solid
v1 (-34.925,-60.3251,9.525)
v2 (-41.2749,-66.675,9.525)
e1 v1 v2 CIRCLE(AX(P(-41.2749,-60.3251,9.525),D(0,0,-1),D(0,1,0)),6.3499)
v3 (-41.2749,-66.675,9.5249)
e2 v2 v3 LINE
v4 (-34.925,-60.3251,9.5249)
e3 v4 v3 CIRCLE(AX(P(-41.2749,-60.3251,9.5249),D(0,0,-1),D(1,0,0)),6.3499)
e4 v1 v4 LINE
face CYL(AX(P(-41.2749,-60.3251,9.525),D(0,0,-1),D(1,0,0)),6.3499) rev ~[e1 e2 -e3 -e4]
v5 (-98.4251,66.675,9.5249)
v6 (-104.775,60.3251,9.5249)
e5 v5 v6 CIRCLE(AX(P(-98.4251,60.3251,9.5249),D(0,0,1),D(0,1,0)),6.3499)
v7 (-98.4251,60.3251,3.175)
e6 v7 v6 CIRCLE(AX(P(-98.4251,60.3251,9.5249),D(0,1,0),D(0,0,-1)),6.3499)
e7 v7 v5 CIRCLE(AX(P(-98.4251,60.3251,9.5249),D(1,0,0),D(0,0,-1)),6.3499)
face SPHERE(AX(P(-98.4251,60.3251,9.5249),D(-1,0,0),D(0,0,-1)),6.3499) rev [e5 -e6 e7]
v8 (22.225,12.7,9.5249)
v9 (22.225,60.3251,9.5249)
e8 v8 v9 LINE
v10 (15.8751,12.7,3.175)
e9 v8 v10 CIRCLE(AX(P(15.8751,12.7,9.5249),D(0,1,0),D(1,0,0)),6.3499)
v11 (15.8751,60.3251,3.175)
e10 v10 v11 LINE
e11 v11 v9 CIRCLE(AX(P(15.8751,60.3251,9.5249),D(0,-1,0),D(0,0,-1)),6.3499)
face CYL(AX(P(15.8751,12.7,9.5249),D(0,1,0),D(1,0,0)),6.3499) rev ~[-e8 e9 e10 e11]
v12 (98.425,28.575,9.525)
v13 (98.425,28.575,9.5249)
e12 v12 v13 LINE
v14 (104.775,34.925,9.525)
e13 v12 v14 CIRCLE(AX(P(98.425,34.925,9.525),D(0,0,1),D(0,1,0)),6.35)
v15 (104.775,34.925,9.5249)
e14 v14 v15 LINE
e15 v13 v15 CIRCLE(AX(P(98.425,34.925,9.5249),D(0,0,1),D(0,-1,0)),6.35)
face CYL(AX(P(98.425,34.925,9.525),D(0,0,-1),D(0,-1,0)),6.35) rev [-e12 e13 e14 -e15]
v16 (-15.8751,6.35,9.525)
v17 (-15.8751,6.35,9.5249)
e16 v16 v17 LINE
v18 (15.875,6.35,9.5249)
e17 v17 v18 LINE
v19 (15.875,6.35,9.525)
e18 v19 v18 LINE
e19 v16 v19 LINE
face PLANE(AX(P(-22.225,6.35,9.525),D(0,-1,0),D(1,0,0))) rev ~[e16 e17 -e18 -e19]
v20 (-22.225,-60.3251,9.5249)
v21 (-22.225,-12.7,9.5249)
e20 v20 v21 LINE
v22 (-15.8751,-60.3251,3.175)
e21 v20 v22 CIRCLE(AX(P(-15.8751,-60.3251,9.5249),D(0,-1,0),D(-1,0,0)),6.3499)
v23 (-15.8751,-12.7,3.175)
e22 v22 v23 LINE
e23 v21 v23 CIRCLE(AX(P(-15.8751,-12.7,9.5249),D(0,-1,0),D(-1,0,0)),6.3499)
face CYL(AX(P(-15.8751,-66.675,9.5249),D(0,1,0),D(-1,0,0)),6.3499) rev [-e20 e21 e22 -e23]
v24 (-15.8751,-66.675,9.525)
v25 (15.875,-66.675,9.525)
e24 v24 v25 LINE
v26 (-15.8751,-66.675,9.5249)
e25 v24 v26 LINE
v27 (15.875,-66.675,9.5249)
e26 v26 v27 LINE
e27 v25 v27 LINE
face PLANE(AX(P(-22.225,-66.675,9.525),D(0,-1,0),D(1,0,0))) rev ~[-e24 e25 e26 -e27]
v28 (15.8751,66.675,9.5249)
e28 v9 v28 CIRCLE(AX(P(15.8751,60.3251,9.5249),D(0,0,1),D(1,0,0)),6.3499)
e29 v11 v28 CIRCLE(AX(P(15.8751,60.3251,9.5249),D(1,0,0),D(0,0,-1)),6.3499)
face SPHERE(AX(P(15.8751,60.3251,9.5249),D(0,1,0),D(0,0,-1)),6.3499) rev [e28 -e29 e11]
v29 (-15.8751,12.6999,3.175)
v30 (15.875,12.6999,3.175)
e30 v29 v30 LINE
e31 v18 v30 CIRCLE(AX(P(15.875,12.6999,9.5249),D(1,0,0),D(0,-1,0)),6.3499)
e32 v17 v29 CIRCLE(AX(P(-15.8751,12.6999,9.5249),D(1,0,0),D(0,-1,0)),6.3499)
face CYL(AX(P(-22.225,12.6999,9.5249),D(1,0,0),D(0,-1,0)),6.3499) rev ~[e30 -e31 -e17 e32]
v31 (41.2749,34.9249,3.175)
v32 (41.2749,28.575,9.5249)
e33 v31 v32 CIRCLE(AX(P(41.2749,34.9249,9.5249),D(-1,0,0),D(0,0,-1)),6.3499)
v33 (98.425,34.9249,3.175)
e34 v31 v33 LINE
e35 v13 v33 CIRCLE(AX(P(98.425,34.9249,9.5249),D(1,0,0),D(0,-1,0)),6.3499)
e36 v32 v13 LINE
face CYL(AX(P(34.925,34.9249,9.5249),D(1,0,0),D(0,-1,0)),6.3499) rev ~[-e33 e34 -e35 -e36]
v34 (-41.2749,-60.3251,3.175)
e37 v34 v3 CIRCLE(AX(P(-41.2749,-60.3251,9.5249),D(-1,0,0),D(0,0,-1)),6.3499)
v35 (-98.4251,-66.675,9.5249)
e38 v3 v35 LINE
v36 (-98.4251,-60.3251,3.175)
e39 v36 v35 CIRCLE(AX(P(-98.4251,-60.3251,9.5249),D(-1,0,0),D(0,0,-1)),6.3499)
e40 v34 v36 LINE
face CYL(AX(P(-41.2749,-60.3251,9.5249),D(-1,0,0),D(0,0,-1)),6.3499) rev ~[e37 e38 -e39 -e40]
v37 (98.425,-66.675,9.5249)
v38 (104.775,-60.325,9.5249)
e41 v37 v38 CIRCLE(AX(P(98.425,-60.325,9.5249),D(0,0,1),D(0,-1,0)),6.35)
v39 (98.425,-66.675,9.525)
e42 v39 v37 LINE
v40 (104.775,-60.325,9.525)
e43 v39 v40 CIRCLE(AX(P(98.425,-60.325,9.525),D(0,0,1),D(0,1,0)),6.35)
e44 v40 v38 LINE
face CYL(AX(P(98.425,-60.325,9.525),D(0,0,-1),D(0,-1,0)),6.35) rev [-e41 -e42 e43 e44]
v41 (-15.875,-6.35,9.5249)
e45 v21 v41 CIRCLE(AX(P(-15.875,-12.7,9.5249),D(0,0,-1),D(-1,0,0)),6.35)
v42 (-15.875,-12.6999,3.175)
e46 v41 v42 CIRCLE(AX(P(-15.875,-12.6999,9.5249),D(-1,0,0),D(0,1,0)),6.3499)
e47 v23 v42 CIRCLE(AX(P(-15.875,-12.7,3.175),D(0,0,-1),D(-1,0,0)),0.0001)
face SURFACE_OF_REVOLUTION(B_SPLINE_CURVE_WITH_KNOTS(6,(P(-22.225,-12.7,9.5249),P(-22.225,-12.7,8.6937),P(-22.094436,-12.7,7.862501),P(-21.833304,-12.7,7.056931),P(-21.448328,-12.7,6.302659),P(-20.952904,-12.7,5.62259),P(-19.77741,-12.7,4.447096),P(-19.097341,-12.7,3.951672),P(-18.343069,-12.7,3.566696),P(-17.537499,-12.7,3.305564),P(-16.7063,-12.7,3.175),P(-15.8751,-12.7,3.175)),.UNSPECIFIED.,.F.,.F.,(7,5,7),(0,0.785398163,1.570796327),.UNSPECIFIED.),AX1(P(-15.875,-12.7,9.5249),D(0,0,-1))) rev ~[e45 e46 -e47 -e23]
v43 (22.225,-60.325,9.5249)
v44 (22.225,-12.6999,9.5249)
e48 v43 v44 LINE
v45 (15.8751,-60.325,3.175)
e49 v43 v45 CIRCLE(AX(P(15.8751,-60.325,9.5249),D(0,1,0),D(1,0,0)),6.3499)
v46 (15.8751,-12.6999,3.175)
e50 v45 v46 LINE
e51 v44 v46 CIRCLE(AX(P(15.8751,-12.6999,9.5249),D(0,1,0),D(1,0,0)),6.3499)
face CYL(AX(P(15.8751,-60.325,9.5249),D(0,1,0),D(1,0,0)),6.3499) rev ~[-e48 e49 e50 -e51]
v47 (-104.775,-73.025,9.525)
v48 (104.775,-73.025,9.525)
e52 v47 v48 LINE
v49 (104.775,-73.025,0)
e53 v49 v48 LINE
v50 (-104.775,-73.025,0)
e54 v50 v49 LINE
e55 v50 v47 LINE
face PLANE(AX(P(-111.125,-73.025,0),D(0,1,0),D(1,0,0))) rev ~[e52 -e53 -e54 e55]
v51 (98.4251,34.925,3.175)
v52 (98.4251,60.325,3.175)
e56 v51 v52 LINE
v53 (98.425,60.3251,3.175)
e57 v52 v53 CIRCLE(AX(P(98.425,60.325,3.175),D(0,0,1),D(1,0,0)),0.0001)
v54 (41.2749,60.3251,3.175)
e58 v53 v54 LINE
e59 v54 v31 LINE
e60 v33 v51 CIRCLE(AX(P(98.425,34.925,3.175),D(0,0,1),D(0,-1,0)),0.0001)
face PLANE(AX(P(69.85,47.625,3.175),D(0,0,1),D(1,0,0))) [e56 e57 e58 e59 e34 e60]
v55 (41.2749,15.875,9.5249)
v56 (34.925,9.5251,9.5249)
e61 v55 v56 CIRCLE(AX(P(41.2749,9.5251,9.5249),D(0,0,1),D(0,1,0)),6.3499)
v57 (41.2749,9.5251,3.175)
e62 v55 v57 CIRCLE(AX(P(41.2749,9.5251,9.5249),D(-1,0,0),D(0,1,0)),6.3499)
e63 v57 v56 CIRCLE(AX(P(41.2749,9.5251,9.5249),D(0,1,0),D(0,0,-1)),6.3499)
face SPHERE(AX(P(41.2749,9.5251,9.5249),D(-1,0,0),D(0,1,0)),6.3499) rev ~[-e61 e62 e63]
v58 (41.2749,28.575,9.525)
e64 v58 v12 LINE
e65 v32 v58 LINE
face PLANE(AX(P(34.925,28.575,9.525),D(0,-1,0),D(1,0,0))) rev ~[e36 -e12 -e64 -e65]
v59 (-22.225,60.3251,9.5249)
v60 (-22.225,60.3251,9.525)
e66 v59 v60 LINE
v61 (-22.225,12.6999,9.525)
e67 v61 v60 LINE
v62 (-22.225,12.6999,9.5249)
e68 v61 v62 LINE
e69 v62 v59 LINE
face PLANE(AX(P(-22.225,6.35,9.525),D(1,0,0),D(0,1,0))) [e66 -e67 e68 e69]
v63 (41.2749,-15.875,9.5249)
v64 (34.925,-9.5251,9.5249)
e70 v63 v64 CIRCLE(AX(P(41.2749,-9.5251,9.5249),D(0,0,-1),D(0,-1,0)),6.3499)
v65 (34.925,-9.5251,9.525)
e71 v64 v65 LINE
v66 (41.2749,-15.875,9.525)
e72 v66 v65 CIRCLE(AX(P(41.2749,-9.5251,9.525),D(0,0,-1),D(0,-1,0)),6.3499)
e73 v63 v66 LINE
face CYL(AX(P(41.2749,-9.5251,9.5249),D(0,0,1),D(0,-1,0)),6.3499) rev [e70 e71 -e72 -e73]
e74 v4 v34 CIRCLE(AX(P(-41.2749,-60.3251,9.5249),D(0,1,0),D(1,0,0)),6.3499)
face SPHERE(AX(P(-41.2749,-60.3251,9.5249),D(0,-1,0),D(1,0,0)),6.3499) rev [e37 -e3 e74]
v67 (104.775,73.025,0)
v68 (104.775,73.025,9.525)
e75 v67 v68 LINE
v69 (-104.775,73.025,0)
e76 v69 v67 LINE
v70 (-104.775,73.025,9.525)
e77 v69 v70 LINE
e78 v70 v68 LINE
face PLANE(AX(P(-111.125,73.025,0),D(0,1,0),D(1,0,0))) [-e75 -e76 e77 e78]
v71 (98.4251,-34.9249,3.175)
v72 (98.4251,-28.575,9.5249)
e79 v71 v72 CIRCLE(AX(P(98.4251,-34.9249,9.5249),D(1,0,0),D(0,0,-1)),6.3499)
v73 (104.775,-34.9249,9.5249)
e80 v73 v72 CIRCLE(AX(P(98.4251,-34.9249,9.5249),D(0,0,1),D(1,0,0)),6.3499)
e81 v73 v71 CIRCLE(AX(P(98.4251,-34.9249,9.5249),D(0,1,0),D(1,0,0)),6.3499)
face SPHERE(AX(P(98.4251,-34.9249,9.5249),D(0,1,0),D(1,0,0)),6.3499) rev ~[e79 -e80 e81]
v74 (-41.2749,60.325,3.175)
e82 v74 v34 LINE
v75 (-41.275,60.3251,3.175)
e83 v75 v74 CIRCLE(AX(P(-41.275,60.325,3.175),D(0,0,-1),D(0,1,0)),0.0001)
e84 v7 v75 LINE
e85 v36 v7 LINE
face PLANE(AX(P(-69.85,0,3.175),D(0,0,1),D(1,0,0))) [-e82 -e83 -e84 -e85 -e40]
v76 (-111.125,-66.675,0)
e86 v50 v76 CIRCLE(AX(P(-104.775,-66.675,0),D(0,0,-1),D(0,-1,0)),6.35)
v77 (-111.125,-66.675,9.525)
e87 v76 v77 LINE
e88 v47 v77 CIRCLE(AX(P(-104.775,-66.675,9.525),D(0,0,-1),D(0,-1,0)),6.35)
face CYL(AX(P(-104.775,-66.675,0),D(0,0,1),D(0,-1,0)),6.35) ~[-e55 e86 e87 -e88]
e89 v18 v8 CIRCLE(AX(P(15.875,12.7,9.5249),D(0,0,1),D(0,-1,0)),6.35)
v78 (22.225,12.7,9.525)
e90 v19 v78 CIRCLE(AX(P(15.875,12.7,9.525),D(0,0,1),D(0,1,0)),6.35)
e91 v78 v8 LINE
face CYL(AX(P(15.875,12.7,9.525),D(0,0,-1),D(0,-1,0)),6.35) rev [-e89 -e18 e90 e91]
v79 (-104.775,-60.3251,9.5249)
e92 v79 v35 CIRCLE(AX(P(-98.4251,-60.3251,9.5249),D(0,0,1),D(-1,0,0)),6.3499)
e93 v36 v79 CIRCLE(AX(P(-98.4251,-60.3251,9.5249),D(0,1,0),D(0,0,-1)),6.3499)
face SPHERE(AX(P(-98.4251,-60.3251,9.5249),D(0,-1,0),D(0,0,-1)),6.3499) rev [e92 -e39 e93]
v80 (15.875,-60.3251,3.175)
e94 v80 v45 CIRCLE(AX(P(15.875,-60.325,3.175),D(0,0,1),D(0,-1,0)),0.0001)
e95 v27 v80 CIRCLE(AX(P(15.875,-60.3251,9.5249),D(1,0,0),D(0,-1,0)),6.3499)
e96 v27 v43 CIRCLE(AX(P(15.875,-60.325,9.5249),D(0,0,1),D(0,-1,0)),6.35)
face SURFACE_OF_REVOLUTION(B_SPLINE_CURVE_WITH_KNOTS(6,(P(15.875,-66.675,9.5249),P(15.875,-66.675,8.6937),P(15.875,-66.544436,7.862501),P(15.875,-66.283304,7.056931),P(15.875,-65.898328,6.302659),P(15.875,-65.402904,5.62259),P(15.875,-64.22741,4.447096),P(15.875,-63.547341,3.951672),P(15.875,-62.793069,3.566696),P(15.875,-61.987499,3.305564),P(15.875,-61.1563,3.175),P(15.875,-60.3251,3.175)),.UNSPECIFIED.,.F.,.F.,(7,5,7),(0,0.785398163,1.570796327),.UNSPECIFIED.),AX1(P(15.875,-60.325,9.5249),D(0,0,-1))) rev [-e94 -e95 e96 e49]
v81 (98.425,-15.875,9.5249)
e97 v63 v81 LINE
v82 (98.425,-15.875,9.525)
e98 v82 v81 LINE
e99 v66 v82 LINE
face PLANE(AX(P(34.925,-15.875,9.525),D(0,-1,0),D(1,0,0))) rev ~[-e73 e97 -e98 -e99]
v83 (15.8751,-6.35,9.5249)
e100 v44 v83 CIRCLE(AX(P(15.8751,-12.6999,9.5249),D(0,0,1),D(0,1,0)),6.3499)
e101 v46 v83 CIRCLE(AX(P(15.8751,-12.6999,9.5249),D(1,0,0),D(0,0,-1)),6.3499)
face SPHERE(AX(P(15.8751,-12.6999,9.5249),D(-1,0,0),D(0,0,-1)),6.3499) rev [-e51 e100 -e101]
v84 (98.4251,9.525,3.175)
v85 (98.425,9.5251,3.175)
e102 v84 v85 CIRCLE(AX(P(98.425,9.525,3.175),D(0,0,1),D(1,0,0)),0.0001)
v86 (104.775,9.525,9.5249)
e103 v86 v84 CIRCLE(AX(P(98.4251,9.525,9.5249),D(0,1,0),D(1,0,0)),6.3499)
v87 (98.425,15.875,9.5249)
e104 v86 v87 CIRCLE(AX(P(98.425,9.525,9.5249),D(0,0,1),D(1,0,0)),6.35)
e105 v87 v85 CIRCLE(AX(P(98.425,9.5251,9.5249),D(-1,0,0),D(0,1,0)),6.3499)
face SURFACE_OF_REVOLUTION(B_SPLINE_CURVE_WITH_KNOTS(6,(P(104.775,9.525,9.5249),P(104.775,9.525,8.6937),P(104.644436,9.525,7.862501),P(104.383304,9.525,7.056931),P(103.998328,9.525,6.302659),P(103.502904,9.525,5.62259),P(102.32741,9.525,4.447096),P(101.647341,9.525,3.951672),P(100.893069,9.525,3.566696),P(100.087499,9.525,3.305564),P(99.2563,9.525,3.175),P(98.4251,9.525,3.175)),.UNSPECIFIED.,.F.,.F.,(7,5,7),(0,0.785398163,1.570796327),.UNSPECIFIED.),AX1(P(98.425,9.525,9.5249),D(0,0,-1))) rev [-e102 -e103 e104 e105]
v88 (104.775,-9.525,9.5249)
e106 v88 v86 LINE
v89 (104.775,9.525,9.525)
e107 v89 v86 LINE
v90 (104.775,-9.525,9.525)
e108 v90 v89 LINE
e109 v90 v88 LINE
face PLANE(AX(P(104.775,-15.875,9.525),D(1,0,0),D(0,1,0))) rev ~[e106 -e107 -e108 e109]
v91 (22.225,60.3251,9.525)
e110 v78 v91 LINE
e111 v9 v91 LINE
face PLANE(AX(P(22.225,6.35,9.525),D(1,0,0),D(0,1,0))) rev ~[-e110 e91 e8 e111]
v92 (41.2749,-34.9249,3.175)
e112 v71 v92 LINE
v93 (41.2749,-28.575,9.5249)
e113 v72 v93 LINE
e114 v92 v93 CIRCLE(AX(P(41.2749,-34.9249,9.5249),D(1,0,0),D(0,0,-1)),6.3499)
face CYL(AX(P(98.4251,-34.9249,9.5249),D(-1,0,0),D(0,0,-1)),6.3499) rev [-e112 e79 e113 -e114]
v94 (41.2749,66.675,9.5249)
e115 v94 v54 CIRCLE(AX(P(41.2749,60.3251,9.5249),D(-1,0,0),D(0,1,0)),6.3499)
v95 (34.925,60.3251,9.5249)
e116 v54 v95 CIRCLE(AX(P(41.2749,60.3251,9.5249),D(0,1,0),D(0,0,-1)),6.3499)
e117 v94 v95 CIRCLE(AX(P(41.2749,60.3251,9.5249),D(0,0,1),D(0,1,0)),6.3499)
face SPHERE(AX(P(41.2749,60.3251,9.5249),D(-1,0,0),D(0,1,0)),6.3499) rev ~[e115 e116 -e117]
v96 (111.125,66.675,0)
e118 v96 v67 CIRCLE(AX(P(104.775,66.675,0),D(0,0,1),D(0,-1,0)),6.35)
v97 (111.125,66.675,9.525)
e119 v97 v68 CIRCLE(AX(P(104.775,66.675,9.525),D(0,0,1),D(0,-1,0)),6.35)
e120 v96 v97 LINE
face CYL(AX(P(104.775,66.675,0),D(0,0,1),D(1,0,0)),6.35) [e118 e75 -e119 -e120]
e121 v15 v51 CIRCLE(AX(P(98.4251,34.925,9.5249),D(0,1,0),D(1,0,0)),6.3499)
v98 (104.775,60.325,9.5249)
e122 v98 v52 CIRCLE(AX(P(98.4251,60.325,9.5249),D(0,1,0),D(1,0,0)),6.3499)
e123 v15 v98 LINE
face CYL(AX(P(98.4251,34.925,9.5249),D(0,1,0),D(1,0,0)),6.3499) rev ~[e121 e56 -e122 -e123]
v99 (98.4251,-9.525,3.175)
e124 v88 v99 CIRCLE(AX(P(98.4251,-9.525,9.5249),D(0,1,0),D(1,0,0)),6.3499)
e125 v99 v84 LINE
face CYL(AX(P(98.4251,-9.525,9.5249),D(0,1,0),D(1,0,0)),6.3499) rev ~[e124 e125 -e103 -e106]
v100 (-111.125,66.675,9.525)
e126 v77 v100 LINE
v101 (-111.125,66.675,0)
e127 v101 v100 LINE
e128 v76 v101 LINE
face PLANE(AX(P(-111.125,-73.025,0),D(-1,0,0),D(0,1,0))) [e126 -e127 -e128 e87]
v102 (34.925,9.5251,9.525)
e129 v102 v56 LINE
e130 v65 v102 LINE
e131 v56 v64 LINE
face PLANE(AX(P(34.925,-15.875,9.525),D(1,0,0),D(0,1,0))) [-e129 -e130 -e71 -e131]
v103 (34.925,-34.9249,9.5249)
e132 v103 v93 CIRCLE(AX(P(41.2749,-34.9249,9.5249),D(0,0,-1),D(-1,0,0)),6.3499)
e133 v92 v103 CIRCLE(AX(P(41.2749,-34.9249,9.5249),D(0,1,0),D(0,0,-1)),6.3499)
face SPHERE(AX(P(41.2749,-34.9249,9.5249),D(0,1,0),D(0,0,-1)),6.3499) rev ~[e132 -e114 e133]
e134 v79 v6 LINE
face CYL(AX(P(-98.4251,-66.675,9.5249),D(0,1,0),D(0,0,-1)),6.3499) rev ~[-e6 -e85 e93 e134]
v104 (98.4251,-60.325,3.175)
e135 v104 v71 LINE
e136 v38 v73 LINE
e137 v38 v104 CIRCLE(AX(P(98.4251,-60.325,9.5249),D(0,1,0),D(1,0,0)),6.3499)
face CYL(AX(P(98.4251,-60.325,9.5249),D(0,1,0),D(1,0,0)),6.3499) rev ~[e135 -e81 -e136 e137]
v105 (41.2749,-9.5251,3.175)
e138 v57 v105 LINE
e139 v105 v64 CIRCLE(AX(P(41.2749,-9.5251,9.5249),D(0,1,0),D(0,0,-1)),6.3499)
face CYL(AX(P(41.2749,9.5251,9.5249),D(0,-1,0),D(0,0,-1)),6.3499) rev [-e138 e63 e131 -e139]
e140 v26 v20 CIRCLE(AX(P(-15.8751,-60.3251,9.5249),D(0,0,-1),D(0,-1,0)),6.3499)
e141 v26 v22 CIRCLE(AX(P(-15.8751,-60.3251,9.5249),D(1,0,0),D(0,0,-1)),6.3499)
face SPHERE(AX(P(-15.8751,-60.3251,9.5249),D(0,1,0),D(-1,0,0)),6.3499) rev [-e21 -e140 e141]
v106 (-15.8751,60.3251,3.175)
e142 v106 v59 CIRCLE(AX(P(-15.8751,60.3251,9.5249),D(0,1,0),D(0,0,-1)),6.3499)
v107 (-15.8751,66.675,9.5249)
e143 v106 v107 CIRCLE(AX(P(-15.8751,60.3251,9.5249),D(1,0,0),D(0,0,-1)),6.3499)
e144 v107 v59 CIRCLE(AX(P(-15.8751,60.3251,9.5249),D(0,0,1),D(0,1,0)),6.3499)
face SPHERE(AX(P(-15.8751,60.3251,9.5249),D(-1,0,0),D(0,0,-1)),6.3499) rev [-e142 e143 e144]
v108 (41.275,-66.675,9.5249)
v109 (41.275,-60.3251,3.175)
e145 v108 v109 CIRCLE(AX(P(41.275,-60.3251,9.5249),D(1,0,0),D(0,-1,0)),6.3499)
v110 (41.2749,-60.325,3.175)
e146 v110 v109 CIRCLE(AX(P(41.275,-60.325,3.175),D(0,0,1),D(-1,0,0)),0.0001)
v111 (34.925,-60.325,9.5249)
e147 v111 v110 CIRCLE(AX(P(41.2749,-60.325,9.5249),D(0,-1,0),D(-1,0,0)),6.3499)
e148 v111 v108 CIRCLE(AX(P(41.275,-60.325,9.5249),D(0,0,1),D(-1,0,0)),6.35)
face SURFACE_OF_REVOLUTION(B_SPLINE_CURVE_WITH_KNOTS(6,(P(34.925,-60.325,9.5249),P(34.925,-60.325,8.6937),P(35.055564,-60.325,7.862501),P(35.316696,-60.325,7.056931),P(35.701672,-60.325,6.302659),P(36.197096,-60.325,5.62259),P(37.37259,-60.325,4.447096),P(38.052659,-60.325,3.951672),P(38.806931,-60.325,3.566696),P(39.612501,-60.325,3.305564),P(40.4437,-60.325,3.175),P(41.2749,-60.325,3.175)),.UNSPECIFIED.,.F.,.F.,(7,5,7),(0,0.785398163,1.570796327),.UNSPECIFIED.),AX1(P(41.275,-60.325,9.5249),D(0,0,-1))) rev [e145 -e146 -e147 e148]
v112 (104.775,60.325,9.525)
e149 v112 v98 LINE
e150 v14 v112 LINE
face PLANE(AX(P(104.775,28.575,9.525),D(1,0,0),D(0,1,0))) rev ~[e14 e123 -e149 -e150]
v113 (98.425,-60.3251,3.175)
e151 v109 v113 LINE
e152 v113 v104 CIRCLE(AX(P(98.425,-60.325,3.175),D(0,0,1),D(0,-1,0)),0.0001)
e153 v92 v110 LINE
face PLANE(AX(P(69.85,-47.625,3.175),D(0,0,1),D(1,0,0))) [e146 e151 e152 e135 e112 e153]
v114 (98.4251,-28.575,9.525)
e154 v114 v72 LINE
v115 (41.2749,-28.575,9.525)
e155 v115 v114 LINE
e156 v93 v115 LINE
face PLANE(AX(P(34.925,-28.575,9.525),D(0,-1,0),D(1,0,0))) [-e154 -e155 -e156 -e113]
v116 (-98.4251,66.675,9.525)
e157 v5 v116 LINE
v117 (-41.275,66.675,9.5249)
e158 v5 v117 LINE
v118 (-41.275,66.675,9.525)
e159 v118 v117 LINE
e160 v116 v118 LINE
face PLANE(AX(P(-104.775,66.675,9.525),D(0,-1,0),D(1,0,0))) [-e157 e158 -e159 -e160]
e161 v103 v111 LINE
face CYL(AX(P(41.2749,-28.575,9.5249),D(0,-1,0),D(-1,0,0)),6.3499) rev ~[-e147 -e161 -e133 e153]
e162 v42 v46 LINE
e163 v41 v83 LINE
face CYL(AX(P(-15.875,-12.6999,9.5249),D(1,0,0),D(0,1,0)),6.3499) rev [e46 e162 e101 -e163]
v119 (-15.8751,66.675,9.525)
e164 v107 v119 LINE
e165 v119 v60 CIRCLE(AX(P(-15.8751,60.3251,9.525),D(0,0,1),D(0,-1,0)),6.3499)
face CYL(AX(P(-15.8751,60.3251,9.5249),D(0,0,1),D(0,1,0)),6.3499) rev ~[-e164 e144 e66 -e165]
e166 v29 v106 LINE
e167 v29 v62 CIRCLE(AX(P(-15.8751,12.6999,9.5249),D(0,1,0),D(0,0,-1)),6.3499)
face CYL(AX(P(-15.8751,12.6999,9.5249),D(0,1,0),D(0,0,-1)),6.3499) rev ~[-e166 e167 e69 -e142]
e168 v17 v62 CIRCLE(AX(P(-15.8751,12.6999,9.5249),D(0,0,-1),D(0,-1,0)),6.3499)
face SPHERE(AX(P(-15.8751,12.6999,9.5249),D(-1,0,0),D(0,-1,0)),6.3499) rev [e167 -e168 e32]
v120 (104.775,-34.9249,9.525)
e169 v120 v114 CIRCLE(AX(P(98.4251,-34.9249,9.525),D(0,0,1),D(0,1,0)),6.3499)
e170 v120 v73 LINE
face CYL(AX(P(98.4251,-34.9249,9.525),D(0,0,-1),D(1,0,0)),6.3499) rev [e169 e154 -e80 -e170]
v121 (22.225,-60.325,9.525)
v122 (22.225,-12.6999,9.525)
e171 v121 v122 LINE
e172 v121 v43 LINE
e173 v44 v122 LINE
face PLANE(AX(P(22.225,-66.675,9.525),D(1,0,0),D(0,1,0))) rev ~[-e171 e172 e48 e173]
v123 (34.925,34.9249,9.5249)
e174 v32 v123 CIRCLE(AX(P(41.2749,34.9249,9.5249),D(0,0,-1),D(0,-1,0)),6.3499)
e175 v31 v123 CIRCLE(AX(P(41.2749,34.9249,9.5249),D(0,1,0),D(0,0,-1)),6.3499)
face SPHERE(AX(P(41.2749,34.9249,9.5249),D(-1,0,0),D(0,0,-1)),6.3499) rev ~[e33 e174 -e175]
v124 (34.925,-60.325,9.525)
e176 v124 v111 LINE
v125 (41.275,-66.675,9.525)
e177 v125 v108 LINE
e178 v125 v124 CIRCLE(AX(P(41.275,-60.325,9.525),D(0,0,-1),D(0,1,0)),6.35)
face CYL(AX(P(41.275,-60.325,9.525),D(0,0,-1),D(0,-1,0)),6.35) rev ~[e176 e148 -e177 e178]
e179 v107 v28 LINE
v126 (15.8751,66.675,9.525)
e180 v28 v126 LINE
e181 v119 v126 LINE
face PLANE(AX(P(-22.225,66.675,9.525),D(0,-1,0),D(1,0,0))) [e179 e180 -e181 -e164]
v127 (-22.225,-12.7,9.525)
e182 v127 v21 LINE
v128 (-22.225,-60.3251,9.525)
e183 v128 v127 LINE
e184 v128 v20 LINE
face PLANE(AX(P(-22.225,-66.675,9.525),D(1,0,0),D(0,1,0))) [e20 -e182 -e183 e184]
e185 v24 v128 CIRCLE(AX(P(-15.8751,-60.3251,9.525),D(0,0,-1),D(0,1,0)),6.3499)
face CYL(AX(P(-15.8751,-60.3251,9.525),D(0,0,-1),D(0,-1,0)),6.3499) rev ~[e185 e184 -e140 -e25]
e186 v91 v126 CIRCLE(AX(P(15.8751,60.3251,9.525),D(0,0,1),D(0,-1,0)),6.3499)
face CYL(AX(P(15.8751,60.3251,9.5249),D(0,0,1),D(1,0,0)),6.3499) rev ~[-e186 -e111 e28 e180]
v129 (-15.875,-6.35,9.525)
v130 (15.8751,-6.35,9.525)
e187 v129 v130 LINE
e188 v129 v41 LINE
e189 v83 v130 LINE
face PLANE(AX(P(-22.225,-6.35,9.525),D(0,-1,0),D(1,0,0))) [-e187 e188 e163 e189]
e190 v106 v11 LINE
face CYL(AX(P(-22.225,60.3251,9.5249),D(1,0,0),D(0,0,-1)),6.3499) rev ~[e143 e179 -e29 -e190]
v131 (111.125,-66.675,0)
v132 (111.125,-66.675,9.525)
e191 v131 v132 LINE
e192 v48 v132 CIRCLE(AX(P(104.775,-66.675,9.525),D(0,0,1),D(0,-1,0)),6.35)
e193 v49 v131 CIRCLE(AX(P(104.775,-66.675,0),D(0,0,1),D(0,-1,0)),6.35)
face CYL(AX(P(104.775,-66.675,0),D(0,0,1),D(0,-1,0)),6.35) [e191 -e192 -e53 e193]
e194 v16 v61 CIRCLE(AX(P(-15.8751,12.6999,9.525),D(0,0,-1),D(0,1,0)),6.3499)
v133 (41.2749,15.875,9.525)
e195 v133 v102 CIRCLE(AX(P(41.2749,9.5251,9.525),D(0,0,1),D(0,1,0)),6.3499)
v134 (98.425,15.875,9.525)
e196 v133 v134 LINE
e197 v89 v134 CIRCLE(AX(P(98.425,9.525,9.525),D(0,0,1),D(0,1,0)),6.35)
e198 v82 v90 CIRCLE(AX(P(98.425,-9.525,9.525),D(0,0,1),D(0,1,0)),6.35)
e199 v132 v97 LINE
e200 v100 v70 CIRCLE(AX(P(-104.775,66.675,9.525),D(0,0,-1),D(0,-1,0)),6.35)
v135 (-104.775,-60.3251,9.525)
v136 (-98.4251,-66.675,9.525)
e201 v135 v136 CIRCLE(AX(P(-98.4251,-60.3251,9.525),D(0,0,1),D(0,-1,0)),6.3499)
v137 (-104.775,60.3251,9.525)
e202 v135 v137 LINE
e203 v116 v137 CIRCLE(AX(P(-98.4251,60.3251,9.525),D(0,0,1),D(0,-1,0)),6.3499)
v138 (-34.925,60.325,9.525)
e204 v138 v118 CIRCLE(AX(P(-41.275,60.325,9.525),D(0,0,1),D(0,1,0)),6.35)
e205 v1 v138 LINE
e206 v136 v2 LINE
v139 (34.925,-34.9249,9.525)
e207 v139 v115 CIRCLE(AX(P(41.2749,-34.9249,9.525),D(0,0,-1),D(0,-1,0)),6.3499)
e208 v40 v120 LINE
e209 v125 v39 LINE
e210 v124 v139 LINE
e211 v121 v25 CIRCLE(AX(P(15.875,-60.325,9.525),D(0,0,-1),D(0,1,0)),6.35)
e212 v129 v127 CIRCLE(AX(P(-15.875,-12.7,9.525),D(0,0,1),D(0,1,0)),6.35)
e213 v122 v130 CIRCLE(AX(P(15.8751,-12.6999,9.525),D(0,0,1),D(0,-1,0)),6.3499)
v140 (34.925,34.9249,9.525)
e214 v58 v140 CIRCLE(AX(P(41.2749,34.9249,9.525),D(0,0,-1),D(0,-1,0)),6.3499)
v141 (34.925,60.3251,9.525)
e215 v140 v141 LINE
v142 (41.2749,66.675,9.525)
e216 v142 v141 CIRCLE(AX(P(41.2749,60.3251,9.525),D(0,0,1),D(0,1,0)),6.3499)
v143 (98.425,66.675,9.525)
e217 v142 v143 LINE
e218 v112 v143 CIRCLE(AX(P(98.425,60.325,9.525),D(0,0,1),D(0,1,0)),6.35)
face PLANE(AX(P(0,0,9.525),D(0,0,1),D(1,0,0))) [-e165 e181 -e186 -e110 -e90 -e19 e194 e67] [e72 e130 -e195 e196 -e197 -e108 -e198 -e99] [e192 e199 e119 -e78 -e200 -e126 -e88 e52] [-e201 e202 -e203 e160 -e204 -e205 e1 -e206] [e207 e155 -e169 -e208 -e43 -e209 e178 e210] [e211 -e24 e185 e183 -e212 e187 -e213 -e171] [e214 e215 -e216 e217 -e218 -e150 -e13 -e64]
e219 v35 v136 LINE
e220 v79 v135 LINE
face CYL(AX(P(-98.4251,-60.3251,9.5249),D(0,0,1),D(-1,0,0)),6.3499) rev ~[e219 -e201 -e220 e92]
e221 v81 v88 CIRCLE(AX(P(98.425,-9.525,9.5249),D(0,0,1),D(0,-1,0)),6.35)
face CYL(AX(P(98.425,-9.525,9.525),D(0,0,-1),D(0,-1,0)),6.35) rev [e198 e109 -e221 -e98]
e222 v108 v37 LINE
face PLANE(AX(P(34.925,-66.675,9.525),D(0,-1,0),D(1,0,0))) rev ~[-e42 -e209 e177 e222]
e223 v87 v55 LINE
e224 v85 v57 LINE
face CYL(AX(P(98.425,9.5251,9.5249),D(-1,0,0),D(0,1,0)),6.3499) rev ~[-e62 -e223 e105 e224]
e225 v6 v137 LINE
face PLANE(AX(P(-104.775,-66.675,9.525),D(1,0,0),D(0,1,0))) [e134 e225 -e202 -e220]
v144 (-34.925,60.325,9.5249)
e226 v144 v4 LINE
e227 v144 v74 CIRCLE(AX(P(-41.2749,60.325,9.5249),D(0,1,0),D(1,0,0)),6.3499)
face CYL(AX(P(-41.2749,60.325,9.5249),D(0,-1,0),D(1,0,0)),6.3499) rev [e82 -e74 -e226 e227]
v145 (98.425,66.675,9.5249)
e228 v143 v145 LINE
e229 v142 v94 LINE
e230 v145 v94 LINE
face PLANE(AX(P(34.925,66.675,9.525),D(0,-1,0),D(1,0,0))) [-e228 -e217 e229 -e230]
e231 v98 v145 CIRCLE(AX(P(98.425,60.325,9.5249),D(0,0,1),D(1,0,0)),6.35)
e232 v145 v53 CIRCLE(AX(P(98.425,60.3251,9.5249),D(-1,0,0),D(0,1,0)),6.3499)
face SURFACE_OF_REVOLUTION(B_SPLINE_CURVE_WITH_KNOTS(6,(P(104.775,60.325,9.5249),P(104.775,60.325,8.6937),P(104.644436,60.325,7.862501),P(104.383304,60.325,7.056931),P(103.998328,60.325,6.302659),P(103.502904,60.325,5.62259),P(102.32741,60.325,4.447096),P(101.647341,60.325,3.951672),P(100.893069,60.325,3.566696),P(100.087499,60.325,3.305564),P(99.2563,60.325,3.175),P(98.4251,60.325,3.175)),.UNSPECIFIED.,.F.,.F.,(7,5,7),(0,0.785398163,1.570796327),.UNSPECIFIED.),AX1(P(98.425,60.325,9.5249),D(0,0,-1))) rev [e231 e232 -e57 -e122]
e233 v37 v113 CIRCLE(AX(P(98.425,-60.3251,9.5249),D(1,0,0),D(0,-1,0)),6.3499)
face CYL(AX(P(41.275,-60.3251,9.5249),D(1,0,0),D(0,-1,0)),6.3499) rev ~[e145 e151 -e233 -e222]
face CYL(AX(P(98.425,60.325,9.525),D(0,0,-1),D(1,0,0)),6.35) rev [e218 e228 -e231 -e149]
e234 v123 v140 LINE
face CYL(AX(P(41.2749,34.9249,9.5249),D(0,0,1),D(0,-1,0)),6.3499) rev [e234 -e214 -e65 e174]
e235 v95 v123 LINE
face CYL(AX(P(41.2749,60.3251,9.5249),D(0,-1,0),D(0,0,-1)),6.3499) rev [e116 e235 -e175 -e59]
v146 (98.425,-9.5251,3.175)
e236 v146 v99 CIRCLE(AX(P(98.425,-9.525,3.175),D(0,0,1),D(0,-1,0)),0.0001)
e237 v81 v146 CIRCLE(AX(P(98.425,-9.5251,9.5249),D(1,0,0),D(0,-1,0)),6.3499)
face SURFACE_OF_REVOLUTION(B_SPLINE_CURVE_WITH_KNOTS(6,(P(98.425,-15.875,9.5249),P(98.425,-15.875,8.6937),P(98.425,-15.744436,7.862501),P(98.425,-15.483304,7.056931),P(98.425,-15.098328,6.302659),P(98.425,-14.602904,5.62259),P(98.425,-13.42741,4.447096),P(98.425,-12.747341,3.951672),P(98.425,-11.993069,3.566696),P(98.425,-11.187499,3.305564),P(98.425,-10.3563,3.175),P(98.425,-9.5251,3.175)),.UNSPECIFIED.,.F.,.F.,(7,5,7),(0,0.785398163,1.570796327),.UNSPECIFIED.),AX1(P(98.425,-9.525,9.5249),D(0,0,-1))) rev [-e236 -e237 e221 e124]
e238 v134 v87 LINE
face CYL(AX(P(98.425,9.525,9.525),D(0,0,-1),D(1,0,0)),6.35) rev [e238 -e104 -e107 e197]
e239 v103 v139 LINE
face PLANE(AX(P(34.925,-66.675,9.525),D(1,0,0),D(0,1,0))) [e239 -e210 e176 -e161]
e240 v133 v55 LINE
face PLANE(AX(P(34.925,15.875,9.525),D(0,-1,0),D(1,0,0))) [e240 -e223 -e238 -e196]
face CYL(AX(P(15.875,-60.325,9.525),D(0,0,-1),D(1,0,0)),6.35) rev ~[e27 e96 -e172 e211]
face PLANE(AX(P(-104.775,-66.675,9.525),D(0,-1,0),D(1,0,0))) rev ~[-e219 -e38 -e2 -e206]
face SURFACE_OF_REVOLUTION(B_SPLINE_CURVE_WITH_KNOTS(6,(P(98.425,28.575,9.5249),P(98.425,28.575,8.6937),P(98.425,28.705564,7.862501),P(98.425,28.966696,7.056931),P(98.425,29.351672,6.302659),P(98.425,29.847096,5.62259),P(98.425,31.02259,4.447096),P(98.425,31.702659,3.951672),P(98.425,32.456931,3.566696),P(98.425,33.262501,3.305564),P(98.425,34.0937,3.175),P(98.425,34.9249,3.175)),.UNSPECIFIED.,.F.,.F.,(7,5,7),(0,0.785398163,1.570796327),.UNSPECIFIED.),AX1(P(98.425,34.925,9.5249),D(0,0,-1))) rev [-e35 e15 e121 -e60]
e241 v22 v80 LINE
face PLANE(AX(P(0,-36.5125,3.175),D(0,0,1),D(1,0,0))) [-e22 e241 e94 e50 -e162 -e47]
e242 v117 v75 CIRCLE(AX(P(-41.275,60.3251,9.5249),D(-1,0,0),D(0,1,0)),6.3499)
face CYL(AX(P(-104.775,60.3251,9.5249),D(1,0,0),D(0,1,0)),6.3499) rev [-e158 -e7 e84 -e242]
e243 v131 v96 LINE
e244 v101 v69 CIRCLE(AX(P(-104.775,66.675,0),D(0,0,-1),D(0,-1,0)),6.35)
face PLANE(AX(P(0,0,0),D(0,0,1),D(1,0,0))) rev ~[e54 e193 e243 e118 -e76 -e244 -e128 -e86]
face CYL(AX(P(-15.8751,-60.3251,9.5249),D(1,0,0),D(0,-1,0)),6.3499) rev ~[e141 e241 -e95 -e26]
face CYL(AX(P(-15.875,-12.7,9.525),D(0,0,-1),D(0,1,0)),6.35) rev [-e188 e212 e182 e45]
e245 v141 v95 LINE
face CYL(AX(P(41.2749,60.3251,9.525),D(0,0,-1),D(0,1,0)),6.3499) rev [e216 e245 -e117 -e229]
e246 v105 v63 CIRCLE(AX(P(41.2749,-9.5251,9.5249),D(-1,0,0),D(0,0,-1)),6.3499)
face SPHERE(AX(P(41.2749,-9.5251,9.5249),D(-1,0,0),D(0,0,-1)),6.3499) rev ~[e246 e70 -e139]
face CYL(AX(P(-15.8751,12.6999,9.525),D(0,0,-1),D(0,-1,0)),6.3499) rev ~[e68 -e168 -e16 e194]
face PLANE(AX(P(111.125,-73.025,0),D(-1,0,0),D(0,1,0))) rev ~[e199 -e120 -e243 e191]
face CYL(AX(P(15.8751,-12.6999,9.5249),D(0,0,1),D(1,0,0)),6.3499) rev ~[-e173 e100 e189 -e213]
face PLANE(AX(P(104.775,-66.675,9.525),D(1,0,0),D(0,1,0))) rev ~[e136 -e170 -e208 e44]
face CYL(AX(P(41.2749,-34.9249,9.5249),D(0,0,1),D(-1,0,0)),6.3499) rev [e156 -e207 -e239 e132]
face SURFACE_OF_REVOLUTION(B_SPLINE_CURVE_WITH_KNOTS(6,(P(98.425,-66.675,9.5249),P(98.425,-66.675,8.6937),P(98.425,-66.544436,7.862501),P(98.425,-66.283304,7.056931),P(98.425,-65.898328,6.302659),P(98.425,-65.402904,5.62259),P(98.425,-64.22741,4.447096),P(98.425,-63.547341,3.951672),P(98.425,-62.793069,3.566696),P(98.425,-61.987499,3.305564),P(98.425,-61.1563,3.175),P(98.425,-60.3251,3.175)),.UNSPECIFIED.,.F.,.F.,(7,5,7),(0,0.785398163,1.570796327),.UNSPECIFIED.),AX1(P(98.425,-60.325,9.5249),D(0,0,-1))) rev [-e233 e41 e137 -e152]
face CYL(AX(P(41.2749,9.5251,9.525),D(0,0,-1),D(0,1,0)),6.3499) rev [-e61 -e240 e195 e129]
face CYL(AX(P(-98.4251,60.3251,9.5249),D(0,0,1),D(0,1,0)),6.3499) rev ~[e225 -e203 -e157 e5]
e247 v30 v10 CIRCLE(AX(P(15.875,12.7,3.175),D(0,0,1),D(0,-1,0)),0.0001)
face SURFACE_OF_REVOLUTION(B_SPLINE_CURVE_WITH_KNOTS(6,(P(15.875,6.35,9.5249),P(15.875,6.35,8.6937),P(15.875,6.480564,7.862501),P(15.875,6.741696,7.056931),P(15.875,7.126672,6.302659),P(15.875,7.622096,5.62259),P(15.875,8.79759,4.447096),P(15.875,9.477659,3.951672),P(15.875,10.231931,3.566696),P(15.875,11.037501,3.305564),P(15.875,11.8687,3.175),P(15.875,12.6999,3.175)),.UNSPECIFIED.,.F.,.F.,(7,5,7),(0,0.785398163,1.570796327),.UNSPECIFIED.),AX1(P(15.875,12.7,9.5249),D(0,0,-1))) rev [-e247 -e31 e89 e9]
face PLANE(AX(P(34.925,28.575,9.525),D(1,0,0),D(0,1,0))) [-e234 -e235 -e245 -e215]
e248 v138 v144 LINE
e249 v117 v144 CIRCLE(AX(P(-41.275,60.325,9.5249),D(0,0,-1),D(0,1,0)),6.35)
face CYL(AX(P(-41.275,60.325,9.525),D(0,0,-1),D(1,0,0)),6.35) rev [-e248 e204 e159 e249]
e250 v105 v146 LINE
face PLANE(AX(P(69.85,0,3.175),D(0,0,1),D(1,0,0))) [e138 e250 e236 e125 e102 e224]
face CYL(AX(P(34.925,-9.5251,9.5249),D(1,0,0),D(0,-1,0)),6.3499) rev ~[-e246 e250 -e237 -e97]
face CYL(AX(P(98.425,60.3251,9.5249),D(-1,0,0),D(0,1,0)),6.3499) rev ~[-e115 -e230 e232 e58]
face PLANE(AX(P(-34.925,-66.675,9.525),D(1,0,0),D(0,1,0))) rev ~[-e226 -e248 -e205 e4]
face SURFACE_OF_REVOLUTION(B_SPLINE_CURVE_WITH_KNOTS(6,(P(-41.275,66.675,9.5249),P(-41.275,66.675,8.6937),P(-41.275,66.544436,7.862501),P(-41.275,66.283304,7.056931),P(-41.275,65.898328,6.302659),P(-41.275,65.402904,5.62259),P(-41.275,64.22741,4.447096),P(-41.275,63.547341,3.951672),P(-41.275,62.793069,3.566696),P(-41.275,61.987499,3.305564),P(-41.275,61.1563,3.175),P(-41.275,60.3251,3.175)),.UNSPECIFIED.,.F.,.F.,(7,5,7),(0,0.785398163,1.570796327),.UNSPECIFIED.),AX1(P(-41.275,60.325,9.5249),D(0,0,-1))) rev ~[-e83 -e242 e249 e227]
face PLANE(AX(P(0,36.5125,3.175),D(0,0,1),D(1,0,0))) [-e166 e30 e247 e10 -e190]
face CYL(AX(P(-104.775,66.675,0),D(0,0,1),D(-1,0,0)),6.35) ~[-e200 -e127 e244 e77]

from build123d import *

# Parameters (mm, degrees)
F0_W     = 222.25
F0_H     = 146.05
F1_DEPTH = 9.525
F2_W     = 69.85
F2_H     = 38.1
F2_H_2   = 133.35
F2_H_3   = 31.75
F2_W_2   = 44.45
F2_H_4   = 60.325
F3_DEPTH = 6.35
F4_F1_R  = 6.35
F4_F2_R  = 6.35
F4_F3_R  = 6.35
F4_F4_R  = 6.35
F4_F5_R  = 6.35
F4_F6_R  = 6.3499
F4_F7_R  = 6.35
F4_F8_R  = 6.3499
F4_F9_R  = 6.35
F4_F10_R = 6.35
F4_F11_R = 6.3499
F4_F12_R = 6.3499
F4_F13_R = 6.35
F4_F14_R = 6.3499
F4_F15_R = 6.3499
F4_F16_R = 6.3499
F4_F17_R = 6.35
F4_F18_R = 6.35
F4_F19_R = 6.3499
F4_F20_R = 6.3499
F4_F21_R = 6.35
F4_F22_R = 6.3499
F4_F23_R = 6.3499
F4_F24_R = 6.3499
F4_F25_R = 6.35
F4_F26_R = 6.35
F4_F27_R = 6.3499
F4_F28_R = 6.3499


# Not quite as in the source:
# - two fillets or chamfers of one size are made in one step
# - a fillet or chamfer is up to 0.001 mm smaller than in the source, because OpenCascade refuses the exact size
# - a feature of the source that left no trace in its solid (it failed there, or was rolled back) is left out


with BuildPart() as f1:
    # F0 (on Top) → F1 (new body)
    with BuildSketch(Plane.XY):
        Rectangle(F0_W, F0_H)
    extrude(amount=F1_DEPTH)

    # F2 (on face) → F3 (cut)
    with BuildSketch(Plane.XY.offset(9.525)):
        with Locations((69.85, 47.625)):
            Rectangle(F2_W, F2_H)
        with Locations((69.85, -47.625)):
            Rectangle(F2_W, F2_H)
        with Locations((-69.85, 0)):
            Rectangle(F2_W, F2_H_2)
        with Locations((69.85, 0)):
            Rectangle(F2_W, F2_H_3)
        with Locations((0, -36.5125)):
            Rectangle(F2_W_2, F2_H_4)
        with Locations((0, 36.5125)):
            Rectangle(F2_W_2, F2_H_4)
    extrude(amount=-F3_DEPTH, mode=Mode.SUBTRACT)

    # F4: fillet of radius 6.35 on 46 edges, made by hand

    # F4_f1
    f4_f1_edges = [f1.edges().sort_by_distance(p)[0] for p in [
        (111.125, -73.025, 4.7625),
    ]]
    fillet(f4_f1_edges, radius=F4_F1_R)

    # F4_f2
    f4_f2_edges = [f1.edges().sort_by_distance(p)[0] for p in [
        (111.125, 73.025, 4.7625),
    ]]
    fillet(f4_f2_edges, radius=F4_F2_R)

    # F4_f3
    f4_f3_edges = [f1.edges().sort_by_distance(p)[0] for p in [
        (-111.125, -73.025, 4.7625),
    ]]
    fillet(f4_f3_edges, radius=F4_F3_R)

    # F4_f4
    f4_f4_edges = [f1.edges().sort_by_distance(p)[0] for p in [
        (-111.125, 73.025, 4.7625),
    ]]
    fillet(f4_f4_edges, radius=F4_F4_R)

    # F4_f5
    f4_f5_edges = [f1.edges().sort_by_distance(p)[0] for p in [
        (-22.225, -6.35, 6.35),
    ]]
    fillet(f4_f5_edges, radius=F4_F5_R)

    # F4_f6 (radius 6.35 in the source; OpenCascade refuses exactly that, so slightly less here)
    f4_f6_edges = [f1.edges().sort_by_distance(p)[0] for p in [
        (-22.225, -39.6875, 3.175),
    ]]
    fillet(f4_f6_edges, radius=F4_F6_R)

    # F4_f7
    f4_f7_edges = [f1.edges().sort_by_distance(p)[0] for p in [
        (22.225, -66.675, 6.35),
    ]]
    fillet(f4_f7_edges, radius=F4_F7_R)

    # F4_f8 (radius 6.35 in the source; OpenCascade refuses exactly that, so slightly less here)
    f4_f8_edges = [f1.edges().sort_by_distance(p)[0] for p in [
        (-5e-05, -66.675, 3.175),
    ]]
    fillet(f4_f8_edges, radius=F4_F8_R)

    # F4_f9
    f4_f9_edges = [f1.edges().sort_by_distance(p)[0] for p in [
        (34.925, -66.675, 6.35),
    ]]
    fillet(f4_f9_edges, radius=F4_F9_R)

    # F4_f10
    f4_f10_edges = [f1.edges().sort_by_distance(p)[0] for p in [
        (104.775, -66.675, 6.35),
    ]]
    fillet(f4_f10_edges, radius=F4_F10_R)

    # F4_f11 (radius 6.35 in the source; OpenCascade refuses exactly that, so slightly less here)
    f4_f11_edges = [f1.edges().sort_by_distance(p)[0] for p in [
        (69.85, -66.675, 3.175),
    ]]
    fillet(f4_f11_edges, radius=F4_F11_R)

    # F4_f12 (radius 6.35 in the source; OpenCascade refuses exactly that, so slightly less here)
    f4_f12_edges = [f1.edges().sort_by_distance(p)[0] for p in [
        (104.775, -28.575, 9.52495),
    ]]
    fillet(f4_f12_edges, radius=F4_F12_R)

    # F4_f13
    f4_f13_edges = [f1.edges().sort_by_distance(p)[0] for p in [
        (-34.925, 66.675, 6.35),
    ]]
    fillet(f4_f13_edges, radius=F4_F13_R)

    # F4_f14 (radius 6.35 in the source; OpenCascade refuses exactly that, so slightly less here)
    f4_f14_edges = [f1.edges().sort_by_distance(p)[0] for p in [
        (-73.025, 66.675, 3.175),
    ]]
    fillet(f4_f14_edges, radius=F4_F14_R)

    # F4_f15 (radius 6.35 in the source; OpenCascade refuses exactly that, so slightly less here)
    f4_f15_edges = [f1.edges().sort_by_distance(p)[0] for p in [
        (-104.775, -3.17495, 3.175),
    ]]
    fillet(f4_f15_edges, radius=F4_F15_R)

    # F4_f16 (radius 6.35 in the source; OpenCascade refuses exactly that, so slightly less here)
    f4_f16_edges = [f1.edges().sort_by_distance(p)[0] for p in [
        (-34.925, -66.675, 9.52495),
    ]]
    fillet(f4_f16_edges, radius=F4_F16_R)

    # F4_f17
    f4_f17_edges = [f1.edges().sort_by_distance(p)[0] for p in [
        (104.775, -15.875, 6.35),
    ]]
    fillet(f4_f17_edges, radius=F4_F17_R)

    # F4_f18
    f4_f18_edges = [f1.edges().sort_by_distance(p)[0] for p in [
        (104.775, 15.875, 6.35),
    ]]
    fillet(f4_f18_edges, radius=F4_F18_R)

    # F4_f19 (radius 6.35 in the source; OpenCascade refuses exactly that, so slightly less here)
    f4_f19_edges = [f1.edges().sort_by_distance(p)[0] for p in [
        (104.775, 0, 3.175),
    ]]
    fillet(f4_f19_edges, radius=F4_F19_R)

    # F4_f20 (radius 6.35 in the source; OpenCascade refuses exactly that, so slightly less here)
    f4_f20_edges = [f1.edges().sort_by_distance(p)[0] for p in [
        (34.925, 15.875, 9.52495),
    ]]
    fillet(f4_f20_edges, radius=F4_F20_R)

    # F4_f21
    f4_f21_edges = [f1.edges().sort_by_distance(p)[0] for p in [
        (22.225, 6.35, 6.35),
    ]]
    fillet(f4_f21_edges, radius=F4_F21_R)

    # F4_f22 (radius 6.35 in the source; OpenCascade refuses exactly that, so slightly less here)
    f4_f22_edges = [f1.edges().sort_by_distance(p)[0] for p in [
        (22.225, 39.6875, 3.175),
    ]]
    fillet(f4_f22_edges, radius=F4_F22_R)

    # F4_f23 (radius 6.35 in the source; OpenCascade refuses exactly that, so slightly less here)
    f4_f23_edges = [f1.edges().sort_by_distance(p)[0] for p in [
        (-3.17495, 66.675, 3.175),
    ]]
    fillet(f4_f23_edges, radius=F4_F23_R)

    # F4_f24 (radius 6.35 in the source; OpenCascade refuses exactly that, so slightly less here)
    f4_f24_edges = [f1.edges().sort_by_distance(p)[0] for p in [
        (-22.225, 6.35, 9.52495),
    ]]
    fillet(f4_f24_edges, radius=F4_F24_R)

    # F4_f25
    f4_f25_edges = [f1.edges().sort_by_distance(p)[0] for p in [
        (104.775, 28.575, 6.35),
    ]]
    fillet(f4_f25_edges, radius=F4_F25_R)

    # F4_f26
    f4_f26_edges = [f1.edges().sort_by_distance(p)[0] for p in [
        (104.775, 66.675, 6.35),
    ]]
    fillet(f4_f26_edges, radius=F4_F26_R)

    # F4_f27 (radius 6.35 in the source; OpenCascade refuses exactly that, so slightly less here)
    f4_f27_edges = [f1.edges().sort_by_distance(p)[0] for p in [
        (104.775, 47.625, 3.175),
    ]]
    fillet(f4_f27_edges, radius=F4_F27_R)

    # F4_f28 (radius 6.35 in the source; OpenCascade refuses exactly that, so slightly less here)
    f4_f28_edges = [f1.edges().sort_by_distance(p)[0] for p in [
        (34.925, 66.675, 9.52495),
    ]]
    fillet(f4_f28_edges, radius=F4_F28_R)


solid = f1.part
